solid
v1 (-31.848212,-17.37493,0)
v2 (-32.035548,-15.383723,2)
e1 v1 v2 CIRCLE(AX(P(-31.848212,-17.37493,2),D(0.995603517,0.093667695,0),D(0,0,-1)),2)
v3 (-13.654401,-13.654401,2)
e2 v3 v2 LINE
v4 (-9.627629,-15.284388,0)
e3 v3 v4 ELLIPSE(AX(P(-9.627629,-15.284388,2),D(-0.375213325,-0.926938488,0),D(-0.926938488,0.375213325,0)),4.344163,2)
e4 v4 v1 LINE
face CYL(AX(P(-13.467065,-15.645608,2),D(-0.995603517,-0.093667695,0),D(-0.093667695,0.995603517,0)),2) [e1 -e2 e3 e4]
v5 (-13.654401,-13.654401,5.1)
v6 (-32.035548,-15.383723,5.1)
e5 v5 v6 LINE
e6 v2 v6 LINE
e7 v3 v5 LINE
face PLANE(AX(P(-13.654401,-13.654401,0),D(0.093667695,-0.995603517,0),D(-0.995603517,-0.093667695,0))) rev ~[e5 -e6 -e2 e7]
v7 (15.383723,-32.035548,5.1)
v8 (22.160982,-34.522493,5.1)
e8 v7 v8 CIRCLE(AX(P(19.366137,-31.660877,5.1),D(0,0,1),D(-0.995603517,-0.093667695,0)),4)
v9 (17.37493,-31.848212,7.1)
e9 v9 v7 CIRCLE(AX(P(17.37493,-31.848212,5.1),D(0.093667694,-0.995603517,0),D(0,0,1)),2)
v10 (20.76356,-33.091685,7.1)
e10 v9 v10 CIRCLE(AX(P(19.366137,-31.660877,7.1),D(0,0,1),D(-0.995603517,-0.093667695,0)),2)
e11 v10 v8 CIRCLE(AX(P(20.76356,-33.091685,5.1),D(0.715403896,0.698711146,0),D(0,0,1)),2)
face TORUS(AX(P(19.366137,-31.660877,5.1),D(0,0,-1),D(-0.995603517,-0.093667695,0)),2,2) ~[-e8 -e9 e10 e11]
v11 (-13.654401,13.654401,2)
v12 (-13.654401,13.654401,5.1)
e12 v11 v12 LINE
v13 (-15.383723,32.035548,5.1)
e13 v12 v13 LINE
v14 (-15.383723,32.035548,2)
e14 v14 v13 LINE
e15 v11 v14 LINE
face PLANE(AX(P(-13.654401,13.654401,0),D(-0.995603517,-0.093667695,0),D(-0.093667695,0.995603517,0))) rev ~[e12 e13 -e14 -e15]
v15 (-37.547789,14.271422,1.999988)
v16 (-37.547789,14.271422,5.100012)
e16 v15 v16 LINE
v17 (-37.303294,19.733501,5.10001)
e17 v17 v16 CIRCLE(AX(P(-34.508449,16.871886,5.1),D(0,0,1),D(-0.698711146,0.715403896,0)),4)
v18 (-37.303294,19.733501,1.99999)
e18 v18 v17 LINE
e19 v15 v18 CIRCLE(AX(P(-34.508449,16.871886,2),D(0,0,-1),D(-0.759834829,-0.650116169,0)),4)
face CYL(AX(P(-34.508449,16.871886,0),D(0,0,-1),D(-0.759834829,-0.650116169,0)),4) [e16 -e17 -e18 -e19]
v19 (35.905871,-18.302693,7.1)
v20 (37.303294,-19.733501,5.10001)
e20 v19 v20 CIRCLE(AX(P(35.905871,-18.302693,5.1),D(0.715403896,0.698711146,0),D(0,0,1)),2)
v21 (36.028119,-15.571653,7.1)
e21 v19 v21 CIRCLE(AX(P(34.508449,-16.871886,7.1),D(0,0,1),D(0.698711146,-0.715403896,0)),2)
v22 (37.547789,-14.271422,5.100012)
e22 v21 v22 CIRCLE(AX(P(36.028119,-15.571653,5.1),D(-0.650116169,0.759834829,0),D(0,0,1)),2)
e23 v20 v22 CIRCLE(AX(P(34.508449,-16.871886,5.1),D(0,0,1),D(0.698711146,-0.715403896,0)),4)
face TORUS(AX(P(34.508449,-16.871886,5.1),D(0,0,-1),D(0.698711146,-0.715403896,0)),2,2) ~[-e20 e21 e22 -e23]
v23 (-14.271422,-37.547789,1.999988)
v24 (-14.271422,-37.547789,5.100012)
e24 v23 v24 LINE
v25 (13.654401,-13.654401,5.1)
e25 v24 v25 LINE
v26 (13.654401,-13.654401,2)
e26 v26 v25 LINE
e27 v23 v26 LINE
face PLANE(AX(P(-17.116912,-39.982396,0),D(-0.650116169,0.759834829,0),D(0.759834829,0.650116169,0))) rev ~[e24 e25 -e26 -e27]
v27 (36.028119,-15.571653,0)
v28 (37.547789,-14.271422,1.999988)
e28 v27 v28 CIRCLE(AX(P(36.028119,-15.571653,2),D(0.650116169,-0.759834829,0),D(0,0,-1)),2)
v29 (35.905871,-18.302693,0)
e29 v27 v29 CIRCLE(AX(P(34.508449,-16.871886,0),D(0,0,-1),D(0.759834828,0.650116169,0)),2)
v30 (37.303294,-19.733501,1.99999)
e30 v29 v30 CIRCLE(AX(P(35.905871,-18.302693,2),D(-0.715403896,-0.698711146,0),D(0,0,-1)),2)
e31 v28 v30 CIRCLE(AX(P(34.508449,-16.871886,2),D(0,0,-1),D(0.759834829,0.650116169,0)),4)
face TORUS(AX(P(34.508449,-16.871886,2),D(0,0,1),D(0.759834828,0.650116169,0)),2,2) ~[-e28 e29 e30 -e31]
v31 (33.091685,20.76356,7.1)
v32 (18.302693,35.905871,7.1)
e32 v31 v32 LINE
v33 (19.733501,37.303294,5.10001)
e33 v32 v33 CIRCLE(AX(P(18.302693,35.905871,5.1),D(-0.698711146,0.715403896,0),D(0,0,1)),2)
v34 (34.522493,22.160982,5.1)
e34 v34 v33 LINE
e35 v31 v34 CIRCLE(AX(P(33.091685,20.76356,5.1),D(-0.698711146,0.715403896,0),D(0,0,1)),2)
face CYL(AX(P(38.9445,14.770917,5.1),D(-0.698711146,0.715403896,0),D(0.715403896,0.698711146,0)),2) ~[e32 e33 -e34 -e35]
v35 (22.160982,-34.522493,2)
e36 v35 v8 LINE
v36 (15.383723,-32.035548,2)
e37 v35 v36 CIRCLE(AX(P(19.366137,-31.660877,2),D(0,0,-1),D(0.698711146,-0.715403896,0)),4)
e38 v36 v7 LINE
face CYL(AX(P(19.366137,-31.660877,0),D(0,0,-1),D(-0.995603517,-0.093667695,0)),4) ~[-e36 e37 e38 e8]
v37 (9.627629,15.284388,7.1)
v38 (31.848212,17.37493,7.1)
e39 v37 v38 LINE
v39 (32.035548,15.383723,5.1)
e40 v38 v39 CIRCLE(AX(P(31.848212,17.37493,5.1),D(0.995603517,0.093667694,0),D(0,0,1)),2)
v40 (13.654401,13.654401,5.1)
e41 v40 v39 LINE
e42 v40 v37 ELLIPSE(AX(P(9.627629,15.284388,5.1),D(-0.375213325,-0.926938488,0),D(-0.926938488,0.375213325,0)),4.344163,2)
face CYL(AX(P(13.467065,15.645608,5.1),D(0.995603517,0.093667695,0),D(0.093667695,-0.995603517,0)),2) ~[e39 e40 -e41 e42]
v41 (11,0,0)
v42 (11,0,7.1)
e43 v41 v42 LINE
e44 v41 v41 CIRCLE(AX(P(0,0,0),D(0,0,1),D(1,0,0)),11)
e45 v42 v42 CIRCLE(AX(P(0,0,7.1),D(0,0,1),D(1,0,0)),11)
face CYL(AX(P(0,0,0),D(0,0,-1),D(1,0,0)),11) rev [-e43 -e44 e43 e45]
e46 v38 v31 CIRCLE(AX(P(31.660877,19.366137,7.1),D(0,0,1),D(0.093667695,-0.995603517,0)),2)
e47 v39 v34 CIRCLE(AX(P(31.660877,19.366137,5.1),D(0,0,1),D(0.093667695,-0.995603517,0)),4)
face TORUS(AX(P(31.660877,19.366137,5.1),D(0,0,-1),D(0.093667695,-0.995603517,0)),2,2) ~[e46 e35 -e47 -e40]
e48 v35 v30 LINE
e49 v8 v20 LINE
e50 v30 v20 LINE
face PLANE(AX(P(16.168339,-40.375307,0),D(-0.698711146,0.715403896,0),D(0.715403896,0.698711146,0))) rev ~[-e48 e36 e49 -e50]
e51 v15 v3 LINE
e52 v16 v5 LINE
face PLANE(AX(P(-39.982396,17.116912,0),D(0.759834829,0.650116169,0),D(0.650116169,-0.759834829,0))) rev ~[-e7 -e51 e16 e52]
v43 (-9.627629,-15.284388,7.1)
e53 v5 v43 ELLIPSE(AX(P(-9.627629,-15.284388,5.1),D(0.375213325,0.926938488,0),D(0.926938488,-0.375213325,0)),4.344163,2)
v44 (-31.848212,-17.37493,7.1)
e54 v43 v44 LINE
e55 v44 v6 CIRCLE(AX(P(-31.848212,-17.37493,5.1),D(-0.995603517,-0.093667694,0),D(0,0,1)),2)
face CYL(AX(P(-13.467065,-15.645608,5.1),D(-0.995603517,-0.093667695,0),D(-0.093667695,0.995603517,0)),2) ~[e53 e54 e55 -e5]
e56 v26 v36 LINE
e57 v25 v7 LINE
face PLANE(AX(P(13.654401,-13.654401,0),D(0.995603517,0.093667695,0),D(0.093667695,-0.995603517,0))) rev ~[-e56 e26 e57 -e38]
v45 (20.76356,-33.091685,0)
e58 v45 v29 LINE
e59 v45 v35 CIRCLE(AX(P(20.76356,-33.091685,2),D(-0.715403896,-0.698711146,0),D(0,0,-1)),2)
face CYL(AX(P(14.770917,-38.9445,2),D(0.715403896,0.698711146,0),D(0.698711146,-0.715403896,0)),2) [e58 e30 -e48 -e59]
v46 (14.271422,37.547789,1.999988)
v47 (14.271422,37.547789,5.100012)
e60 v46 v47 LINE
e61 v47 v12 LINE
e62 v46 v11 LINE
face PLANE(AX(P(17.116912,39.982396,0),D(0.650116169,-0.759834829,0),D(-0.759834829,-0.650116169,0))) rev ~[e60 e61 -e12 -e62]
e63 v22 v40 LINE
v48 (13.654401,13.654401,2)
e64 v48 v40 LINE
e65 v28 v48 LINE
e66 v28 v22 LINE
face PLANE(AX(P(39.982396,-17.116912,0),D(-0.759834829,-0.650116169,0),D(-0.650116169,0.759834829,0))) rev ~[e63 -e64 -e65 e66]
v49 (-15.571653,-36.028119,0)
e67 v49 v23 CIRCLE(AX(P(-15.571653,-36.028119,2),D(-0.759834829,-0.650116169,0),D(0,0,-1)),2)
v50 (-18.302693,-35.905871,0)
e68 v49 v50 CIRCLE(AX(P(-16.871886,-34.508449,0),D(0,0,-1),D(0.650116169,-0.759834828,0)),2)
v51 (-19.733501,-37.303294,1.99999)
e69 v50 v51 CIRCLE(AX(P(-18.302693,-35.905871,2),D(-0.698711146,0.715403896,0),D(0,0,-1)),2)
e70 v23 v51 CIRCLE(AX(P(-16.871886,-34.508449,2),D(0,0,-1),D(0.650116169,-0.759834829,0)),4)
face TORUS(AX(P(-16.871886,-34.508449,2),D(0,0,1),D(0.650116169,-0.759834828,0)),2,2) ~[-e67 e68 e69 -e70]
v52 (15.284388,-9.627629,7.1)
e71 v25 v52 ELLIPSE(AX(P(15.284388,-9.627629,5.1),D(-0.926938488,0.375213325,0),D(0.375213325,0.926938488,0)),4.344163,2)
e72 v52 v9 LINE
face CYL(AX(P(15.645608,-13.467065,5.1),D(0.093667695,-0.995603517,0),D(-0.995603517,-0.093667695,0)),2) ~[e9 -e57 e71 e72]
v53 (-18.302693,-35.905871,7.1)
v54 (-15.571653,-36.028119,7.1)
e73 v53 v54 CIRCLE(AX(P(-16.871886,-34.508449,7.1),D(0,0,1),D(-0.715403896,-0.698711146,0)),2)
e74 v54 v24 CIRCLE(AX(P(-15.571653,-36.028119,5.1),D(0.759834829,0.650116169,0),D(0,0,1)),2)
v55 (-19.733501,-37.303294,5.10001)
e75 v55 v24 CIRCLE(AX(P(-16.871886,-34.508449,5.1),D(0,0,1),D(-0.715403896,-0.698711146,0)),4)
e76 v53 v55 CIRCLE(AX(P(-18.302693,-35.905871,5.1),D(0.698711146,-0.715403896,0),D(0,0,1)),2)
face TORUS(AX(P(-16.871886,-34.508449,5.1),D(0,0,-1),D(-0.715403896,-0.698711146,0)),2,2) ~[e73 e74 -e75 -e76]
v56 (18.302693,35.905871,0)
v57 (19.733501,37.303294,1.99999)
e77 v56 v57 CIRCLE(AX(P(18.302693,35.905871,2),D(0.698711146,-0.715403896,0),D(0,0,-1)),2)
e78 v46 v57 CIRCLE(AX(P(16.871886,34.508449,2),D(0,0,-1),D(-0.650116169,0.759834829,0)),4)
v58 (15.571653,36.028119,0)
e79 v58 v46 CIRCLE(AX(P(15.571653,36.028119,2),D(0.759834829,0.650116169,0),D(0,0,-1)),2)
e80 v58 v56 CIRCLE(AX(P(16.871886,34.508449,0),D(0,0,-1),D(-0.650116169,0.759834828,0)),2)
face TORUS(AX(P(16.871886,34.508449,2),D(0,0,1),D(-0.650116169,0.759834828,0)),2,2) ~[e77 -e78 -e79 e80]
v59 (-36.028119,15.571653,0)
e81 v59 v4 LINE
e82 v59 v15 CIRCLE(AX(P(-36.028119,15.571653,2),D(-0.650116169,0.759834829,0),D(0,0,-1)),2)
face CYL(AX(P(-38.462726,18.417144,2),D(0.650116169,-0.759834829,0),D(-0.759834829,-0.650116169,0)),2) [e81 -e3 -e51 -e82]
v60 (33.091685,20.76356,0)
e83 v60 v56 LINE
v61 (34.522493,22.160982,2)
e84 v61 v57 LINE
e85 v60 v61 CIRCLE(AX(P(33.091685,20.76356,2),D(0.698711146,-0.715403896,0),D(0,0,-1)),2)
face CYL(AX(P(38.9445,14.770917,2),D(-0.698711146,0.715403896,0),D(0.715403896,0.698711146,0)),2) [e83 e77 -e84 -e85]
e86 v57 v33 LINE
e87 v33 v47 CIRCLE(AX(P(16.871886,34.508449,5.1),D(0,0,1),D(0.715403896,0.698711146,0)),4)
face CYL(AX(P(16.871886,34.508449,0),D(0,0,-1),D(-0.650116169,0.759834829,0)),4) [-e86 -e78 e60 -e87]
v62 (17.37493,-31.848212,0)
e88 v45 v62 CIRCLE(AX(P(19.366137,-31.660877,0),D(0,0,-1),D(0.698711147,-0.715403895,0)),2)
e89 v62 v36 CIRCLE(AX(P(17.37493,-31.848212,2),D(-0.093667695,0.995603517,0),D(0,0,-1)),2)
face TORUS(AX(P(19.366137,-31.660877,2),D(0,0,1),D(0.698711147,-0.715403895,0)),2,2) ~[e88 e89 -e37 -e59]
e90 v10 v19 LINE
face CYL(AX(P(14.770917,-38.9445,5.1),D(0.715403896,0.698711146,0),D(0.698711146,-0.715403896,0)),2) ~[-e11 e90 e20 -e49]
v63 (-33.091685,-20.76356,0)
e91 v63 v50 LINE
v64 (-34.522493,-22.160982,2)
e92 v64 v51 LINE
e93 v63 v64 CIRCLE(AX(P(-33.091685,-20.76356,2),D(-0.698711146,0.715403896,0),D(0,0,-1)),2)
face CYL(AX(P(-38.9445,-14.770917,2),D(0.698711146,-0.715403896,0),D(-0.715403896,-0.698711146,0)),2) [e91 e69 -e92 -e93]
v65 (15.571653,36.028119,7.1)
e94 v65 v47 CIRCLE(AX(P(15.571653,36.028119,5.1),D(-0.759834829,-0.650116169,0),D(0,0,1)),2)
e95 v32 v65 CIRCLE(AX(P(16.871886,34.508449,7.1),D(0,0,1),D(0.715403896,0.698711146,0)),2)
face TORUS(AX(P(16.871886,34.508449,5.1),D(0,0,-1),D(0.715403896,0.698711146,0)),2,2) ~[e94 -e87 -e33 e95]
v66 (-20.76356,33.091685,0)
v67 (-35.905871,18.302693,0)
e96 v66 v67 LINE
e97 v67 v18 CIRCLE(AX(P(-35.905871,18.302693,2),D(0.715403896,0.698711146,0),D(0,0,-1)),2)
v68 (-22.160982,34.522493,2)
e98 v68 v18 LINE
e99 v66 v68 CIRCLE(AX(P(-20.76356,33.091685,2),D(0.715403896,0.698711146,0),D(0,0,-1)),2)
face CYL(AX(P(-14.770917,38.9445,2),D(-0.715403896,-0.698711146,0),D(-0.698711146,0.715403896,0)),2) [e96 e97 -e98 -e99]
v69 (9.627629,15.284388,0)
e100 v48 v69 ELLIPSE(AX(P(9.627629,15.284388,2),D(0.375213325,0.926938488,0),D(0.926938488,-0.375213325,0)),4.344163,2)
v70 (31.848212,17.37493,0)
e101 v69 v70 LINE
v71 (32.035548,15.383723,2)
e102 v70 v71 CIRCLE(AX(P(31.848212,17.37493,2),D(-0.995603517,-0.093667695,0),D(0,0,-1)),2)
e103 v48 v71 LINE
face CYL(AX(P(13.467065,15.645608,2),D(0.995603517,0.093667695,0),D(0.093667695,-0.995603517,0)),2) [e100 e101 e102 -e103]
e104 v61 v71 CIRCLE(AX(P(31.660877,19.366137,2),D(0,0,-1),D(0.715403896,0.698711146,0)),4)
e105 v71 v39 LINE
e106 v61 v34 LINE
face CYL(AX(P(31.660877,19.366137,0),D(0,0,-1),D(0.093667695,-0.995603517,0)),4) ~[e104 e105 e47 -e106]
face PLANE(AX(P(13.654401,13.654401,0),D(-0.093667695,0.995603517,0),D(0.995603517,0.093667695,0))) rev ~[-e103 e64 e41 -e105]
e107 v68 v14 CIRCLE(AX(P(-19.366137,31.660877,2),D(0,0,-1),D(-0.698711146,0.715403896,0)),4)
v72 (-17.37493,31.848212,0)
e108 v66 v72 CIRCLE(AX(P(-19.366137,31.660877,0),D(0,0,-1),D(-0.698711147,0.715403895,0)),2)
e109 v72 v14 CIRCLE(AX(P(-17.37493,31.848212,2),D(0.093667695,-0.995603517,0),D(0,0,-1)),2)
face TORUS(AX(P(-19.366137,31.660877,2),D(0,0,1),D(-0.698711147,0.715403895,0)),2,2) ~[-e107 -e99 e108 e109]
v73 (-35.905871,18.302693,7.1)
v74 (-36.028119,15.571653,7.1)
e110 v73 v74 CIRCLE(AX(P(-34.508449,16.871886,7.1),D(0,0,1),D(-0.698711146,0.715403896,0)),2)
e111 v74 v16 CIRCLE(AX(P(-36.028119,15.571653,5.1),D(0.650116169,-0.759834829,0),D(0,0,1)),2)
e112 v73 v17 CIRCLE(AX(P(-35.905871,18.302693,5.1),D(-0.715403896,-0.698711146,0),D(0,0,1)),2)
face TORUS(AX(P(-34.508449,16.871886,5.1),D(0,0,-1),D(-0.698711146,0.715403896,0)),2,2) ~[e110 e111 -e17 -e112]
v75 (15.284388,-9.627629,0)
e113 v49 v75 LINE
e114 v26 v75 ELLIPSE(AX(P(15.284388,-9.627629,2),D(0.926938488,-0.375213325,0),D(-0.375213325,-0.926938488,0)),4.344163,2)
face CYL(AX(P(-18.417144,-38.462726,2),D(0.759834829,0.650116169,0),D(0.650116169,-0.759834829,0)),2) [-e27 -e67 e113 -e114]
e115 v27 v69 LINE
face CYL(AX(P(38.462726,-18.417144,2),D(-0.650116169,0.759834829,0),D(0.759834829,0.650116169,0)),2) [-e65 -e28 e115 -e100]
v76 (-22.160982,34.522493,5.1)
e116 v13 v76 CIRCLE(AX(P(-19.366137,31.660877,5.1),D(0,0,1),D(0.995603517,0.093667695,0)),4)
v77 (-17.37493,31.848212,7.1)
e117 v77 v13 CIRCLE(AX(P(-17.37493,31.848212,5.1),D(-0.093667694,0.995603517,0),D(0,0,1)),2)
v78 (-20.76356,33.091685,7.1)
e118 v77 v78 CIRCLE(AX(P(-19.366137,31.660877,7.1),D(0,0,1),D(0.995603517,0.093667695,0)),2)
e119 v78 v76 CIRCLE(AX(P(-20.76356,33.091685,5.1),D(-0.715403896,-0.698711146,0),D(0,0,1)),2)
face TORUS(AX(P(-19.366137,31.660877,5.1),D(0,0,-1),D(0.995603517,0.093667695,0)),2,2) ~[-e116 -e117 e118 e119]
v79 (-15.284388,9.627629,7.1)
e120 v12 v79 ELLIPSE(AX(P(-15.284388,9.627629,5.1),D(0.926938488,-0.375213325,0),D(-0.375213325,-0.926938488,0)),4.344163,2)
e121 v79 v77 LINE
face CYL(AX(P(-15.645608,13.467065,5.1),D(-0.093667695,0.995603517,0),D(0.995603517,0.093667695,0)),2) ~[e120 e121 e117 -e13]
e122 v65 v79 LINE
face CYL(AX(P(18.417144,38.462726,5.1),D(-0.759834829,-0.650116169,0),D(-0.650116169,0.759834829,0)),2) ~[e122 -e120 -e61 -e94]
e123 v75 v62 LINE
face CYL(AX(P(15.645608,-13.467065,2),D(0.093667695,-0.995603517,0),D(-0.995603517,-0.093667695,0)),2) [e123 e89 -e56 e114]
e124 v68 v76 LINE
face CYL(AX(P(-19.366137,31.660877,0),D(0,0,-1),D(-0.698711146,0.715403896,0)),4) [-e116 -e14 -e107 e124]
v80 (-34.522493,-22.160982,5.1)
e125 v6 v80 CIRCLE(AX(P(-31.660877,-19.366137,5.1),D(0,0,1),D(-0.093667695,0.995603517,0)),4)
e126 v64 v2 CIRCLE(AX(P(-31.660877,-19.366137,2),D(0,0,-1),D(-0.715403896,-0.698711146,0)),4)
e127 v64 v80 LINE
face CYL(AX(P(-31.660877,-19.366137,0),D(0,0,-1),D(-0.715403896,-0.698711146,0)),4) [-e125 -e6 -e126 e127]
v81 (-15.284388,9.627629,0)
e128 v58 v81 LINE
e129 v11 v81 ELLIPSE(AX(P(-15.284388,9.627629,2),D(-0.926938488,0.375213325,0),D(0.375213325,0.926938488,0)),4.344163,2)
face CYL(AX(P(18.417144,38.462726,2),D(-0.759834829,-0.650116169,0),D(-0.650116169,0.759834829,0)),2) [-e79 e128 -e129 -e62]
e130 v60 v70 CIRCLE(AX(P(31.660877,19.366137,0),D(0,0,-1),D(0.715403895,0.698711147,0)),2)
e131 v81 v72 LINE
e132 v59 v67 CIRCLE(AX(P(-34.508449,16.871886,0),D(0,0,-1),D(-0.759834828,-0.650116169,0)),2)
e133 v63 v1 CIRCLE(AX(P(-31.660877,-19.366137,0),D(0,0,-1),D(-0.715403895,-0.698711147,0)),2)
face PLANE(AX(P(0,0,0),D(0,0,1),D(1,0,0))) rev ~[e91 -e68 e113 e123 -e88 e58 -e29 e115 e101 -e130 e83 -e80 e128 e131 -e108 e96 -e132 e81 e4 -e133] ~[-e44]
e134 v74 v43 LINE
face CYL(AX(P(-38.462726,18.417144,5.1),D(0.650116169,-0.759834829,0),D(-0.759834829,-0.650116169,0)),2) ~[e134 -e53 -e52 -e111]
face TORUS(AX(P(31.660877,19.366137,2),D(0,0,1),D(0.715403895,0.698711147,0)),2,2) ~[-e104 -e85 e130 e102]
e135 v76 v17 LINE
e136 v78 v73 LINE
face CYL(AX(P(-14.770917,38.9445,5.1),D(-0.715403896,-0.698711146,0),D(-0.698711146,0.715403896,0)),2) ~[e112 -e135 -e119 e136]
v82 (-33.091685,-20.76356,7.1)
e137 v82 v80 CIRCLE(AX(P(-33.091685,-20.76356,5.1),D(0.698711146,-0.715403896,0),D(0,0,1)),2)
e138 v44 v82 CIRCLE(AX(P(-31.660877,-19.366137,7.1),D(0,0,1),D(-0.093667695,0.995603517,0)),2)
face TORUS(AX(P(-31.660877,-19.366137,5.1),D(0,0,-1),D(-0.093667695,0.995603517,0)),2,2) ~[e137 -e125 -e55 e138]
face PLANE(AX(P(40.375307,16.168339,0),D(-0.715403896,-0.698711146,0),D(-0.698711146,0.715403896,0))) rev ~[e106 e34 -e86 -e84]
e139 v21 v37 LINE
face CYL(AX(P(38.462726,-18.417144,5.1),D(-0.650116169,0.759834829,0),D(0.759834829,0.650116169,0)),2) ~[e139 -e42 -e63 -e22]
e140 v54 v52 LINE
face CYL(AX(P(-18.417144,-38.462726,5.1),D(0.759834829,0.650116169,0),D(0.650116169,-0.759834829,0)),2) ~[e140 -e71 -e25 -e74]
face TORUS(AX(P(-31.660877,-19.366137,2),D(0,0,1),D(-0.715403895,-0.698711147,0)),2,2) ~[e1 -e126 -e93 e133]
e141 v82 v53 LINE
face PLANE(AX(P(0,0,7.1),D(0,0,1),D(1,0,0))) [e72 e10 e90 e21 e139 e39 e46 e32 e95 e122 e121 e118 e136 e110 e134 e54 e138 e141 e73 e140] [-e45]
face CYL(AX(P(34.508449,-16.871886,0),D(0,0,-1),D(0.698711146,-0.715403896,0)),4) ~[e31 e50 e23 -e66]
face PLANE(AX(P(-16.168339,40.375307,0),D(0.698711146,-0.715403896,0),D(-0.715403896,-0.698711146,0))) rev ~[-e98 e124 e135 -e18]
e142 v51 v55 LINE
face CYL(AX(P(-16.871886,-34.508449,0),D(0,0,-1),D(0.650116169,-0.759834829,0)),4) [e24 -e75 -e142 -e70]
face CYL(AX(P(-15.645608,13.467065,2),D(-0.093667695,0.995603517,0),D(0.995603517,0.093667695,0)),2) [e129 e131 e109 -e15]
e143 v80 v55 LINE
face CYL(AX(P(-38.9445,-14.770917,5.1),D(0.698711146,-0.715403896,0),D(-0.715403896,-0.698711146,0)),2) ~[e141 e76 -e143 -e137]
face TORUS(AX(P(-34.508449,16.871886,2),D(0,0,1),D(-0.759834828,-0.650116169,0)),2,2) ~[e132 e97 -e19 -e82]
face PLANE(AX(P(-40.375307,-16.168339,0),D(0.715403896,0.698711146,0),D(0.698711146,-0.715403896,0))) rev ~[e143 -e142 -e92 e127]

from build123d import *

# Parameters (mm, degrees)
F0_W         = 27.3088011891
F0_H         = 27.3088011891
F0_R         = 11
F1_DEPTH     = 7.1
F2_R         = 2
F3_T1_DEPTH  = 7.1
F3_T4_ANGLE  = 128.9490479257
F3_T6_ANGLE  = 128.9490479257
F3_T8_ANGLE  = 128.9490479257
F3_T10_ANGLE = 128.9490479257
F3_T12_ANGLE = 128.9490479257
F3_T14_ANGLE = 128.9490479257
F3_T16_ANGLE = 128.9490479257
F3_T18_ANGLE = 128.9490479257
F3_T20_ANGLE = 86.2266707628
F3_T22_ANGLE = 86.2266707628
F3_T24_ANGLE = 86.2266707628
F3_T26_ANGLE = 86.2266707628
F3_T28_ANGLE = 86.2266707628
F3_T30_ANGLE = 86.2266707628
F3_T32_ANGLE = 86.2266707628
F3_T34_ANGLE = 86.2266707628


# Not quite as in the source:
# - a fillet or chamfer that OpenCascade refuses, or shapes differently, is made with other operations: its cross-section is extruded or revolved along the edge and cut away or added


with BuildPart() as f1:
    # F0 (on Top) → F1 (new body)
    with BuildSketch(Plane.XY):
        Rectangle(F0_W, F0_H)
        Circle(F0_R, mode=Mode.SUBTRACT)
        Polygon((13.6544005945, 13.6544005945), (40.3753073238, 16.1683388102), (17.1169115879, 39.9823956144), (-13.6544005945, 13.6544005945), align=None)
        Polygon((16.1683388102, -40.3753073238), (39.9823956144, -17.1169115879), (13.6544005945, 13.6544005945), (13.6544005945, -13.6544005945), align=None)
        Polygon((-40.3753073238, -16.1683388102), (-17.1169115879, -39.9823956144), (13.6544005945, -13.6544005945), (-13.6544005945, -13.6544005945), align=None)
        Polygon((-13.6544005945, -13.6544005945), (-13.6544005945, 13.6544005945), (-16.1683388102, 40.3753073238), (-39.9823956144, 17.1169115879), align=None)
    extrude(amount=F1_DEPTH)

    # F2
    f2_edges = [f1.edges().sort_by_distance(p)[0] for p in [
        (-1.731255, -26.818398, 7.1),
        (14.91137, -27.014854, 7.1),
        (28.075367, -28.746109, 7.1),
        (26.818398, -1.731255, 7.1),
        (27.014854, 14.91137, 7.1),
        (28.746109, 28.075367, 7.1),
        (1.731255, 26.818398, 7.1),
        (-14.91137, 27.014854, 7.1),
        (-28.075367, 28.746109, 7.1),
        (-26.818398, 1.731255, 7.1),
        (-27.014854, -14.91137, 7.1),
        (-28.746109, -28.075367, 7.1),
        (-28.746109, -28.075367, 0),
        (-27.014854, -14.91137, 0),
        (-26.818398, 1.731255, 0),
        (-28.075367, 28.746109, 0),
        (-14.91137, 27.014854, 0),
        (1.731255, 26.818398, 0),
        (28.746109, 28.075367, 0),
        (27.014854, 14.91137, 0),
        (26.818398, -1.731255, 0),
        (28.075367, -28.746109, 0),
        (14.91137, -27.014854, 0),
        (-1.731255, -26.818398, 0),
    ]]
    fillet(f2_edges, radius=F2_R)

    # F3: fillet of radius 4 on 8 edges, made by hand

    # F3_s2 → F3_t1 (cut)
    with BuildSketch(Plane.XY):
        with BuildLine():
            ThreePointArc((37.3032935738, -19.7335012764), (38.5044476922, -17.050755387), (37.5477883044, -14.2714210172))
            Line((37.5477883044, -14.2714210172), (39.9823956144, -17.1169115879))
            Line((39.9823956144, -17.1169115879), (37.3032935738, -19.7335012764))
        make_face()
        with BuildLine():
            ThreePointArc((14.2714210172, 37.5477883044), (17.050755387, 38.5044476922), (19.7335012764, 37.3032935738))
            Line((19.7335012764, 37.3032935738), (17.1169115879, 39.9823956144))
            Line((17.1169115879, 39.9823956144), (14.2714210172, 37.5477883044))
        make_face()
        with BuildLine():
            ThreePointArc((-37.5477883044, 14.2714210172), (-38.5044476922, 17.050755387), (-37.3032935738, 19.7335012764))
            Line((-37.3032935738, 19.7335012764), (-39.9823956144, 17.1169115879))
            Line((-39.9823956144, 17.1169115879), (-37.5477883044, 14.2714210172))
        make_face()
        with BuildLine():
            ThreePointArc((-14.2714210172, -37.5477883044), (-17.050755387, -38.5044476922), (-19.7335012764, -37.3032935738))
            Line((-19.7335012764, -37.3032935738), (-17.1169115879, -39.9823956144))
            Line((-17.1169115879, -39.9823956144), (-14.2714210172, -37.5477883044))
        make_face()
        with BuildLine():
            ThreePointArc((15.383723208, -32.0355477412), (17.988166327, -35.4160328938), (22.1609818603, -34.5224925468))
            Line((22.1609818603, -34.5224925468), (16.1683388102, -40.3753073238))
            Line((16.1683388102, -40.3753073238), (15.383723208, -32.0355477412))
        make_face()
        with BuildLine():
            ThreePointArc((-34.5224925468, -22.1609818603), (-35.4160328938, -17.988166327), (-32.0355477412, -15.383723208))
            Line((-32.0355477412, -15.383723208), (-40.3753073238, -16.1683388102))
            Line((-40.3753073238, -16.1683388102), (-34.5224925468, -22.1609818603))
        make_face()
        with BuildLine():
            ThreePointArc((-22.1609818603, 34.5224925468), (-17.988166327, 35.4160328938), (-15.383723208, 32.0355477412))
            Line((-15.383723208, 32.0355477412), (-16.1683388102, 40.3753073238))
            Line((-16.1683388102, 40.3753073238), (-22.1609818603, 34.5224925468))
        make_face()
        with BuildLine():
            ThreePointArc((32.0355477412, 15.383723208), (35.4160328938, 17.988166327), (34.5224925468, 22.1609818603))
            Line((34.5224925468, 22.1609818603), (40.3753073238, 16.1683388102))
            Line((40.3753073238, 16.1683388102), (32.0355477412, 15.383723208))
        make_face()
    extrude(amount=F3_T1_DEPTH, mode=Mode.SUBTRACT)

    # F3_s3 → F3_t4 (revolve, cut)
    with BuildSketch(Plane(origin=(5.776383091, -5.914385352, 0), x_dir=(0, 0, 1), z_dir=(-0.6987111461, 0.7154038959, 0))):
        with BuildLine():
            ThreePointArc((0, 38.1816506997), (0.5857864376, 39.5958642621), (2, 40.1816506997))
            Line((2, 40.1816506997), (0, 40.1816506997))
            Line((0, 40.1816506997), (0, 38.1816506997))
        make_face()
    revolve(axis=Axis((31.6608769631, 19.3661372759, 0), (0, 0, -1)), revolution_arc=F3_T4_ANGLE, mode=Mode.SUBTRACT)

    # F3_s5 → F3_t6 (revolve, cut)
    with BuildSketch(Plane(origin=(33.1891022135, 3.1224745943, 0), x_dir=(0, 0, 1), z_dir=(-0.995603517, -0.0936676945, 0))):
        with BuildLine():
            ThreePointArc((7.1, 14.3153930302), (6.5142135624, 12.9011794678), (5.1, 12.3153930302))
            Line((5.1, 12.3153930302), (7.1, 12.3153930302))
            Line((7.1, 12.3153930302), (7.1, 14.3153930302))
        make_face()
    revolve(axis=Axis((31.6608769631, 19.3661372759, 7.1), (0, 0, 1)), revolution_arc=F3_T6_ANGLE, mode=Mode.SUBTRACT)

    # F3_s7 → F3_t8 (revolve, cut)
    with BuildSketch(Plane(origin=(5.914385352, 5.776383091, 0), x_dir=(0, 0, 1), z_dir=(-0.7154038959, -0.6987111461, 0))):
        with BuildLine():
            ThreePointArc((0, 38.1816506997), (0.5857864376, 39.5958642621), (2, 40.1816506997))
            Line((2, 40.1816506997), (0, 40.1816506997))
            Line((0, 40.1816506997), (0, 38.1816506997))
        make_face()
    revolve(axis=Axis((-19.3661372759, 31.6608769631, 0), (0, 0, -1)), revolution_arc=F3_T8_ANGLE, mode=Mode.SUBTRACT)

    # F3_s9 → F3_t10 (revolve, cut)
    with BuildSketch(Plane(origin=(-3.1224745943, 33.1891022135, 0), x_dir=(0, 0, 1), z_dir=(0.0936676945, -0.995603517, 0))):
        with BuildLine():
            ThreePointArc((7.1, 14.3153930302), (6.5142135624, 12.9011794678), (5.1, 12.3153930302))
            Line((5.1, 12.3153930302), (7.1, 12.3153930302))
            Line((7.1, 12.3153930302), (7.1, 14.3153930302))
        make_face()
    revolve(axis=Axis((-19.3661372759, 31.6608769631, 7.1), (0, 0, 1)), revolution_arc=F3_T10_ANGLE, mode=Mode.SUBTRACT)

    # F3_s11 → F3_t12 (revolve, cut)
    with BuildSketch(Plane(origin=(-5.776383091, 5.914385352, 0), x_dir=(0, 0, 1), z_dir=(0.6987111461, -0.7154038959, 0))):
        with BuildLine():
            ThreePointArc((0, 38.1816506997), (0.5857864376, 39.5958642621), (2, 40.1816506997))
            Line((2, 40.1816506997), (0, 40.1816506997))
            Line((0, 40.1816506997), (0, 38.1816506997))
        make_face()
    revolve(axis=Axis((-31.6608769631, -19.3661372759, 0), (0, 0, -1)), revolution_arc=F3_T12_ANGLE, mode=Mode.SUBTRACT)

    # F3_s13 → F3_t14 (revolve, cut)
    with BuildSketch(Plane(origin=(-33.1891022135, -3.1224745943, 0), x_dir=(0, 0, 1), z_dir=(0.995603517, 0.0936676945, 0))):
        with BuildLine():
            ThreePointArc((7.1, 14.3153930302), (6.5142135624, 12.9011794678), (5.1, 12.3153930302))
            Line((5.1, 12.3153930302), (7.1, 12.3153930302))
            Line((7.1, 12.3153930302), (7.1, 14.3153930302))
        make_face()
    revolve(axis=Axis((-31.6608769631, -19.3661372759, 7.1), (0, 0, 1)), revolution_arc=F3_T14_ANGLE, mode=Mode.SUBTRACT)

    # F3_s15 → F3_t16 (revolve, cut)
    with BuildSketch(Plane(origin=(-5.914385352, -5.776383091, 0), x_dir=(0, 0, 1), z_dir=(0.7154038959, 0.6987111461, 0))):
        with BuildLine():
            ThreePointArc((0, 38.1816506997), (0.5857864376, 39.5958642621), (2, 40.1816506997))
            Line((2, 40.1816506997), (0, 40.1816506997))
            Line((0, 40.1816506997), (0, 38.1816506997))
        make_face()
    revolve(axis=Axis((19.3661372759, -31.6608769631, 0), (0, 0, -1)), revolution_arc=F3_T16_ANGLE, mode=Mode.SUBTRACT)

    # F3_s17 → F3_t18 (revolve, cut)
    with BuildSketch(Plane(origin=(3.1224745943, -33.1891022135, 0), x_dir=(0, 0, 1), z_dir=(-0.0936676945, 0.995603517, 0))):
        with BuildLine():
            ThreePointArc((7.1, 14.3153930302), (6.5142135624, 12.9011794678), (5.1, 12.3153930302))
            Line((5.1, 12.3153930302), (7.1, 12.3153930302))
            Line((7.1, 12.3153930302), (7.1, 14.3153930302))
        make_face()
    revolve(axis=Axis((19.3661372759, -31.6608769631, 7.1), (0, 0, 1)), revolution_arc=F3_T18_ANGLE, mode=Mode.SUBTRACT)

    # F3_s19 → F3_t20 (revolve, cut)
    with BuildSketch(Plane(origin=(-26.7874807354, -22.9194210249, 0), x_dir=(0, 0, 1), z_dir=(0.7598348287, 0.6501161689, 0))):
        with BuildLine():
            ThreePointArc((0, 17.2520357401), (0.5857864376, 18.6662493025), (2, 19.2520357401))
            Line((2, 19.2520357401), (0, 19.2520357401))
            Line((0, 19.2520357401), (0, 17.2520357401))
        make_face()
    revolve(axis=Axis((-16.8718856926, -34.5084489895, 0), (0, 0, -1)), revolution_arc=F3_T20_ANGLE, mode=Mode.SUBTRACT)

    # F3_s21 → F3_t22 (revolve, cut)
    with BuildSketch(Plane(origin=(9.0126081794, -9.2279263615, 0), x_dir=(0, 0, 1), z_dir=(-0.6987111461, 0.7154038959, 0))):
        with BuildLine():
            ThreePointArc((7.1, -38.1816506997), (6.5142135624, -39.5958642621), (5.1, -40.1816506997))
            Line((5.1, -40.1816506997), (7.1, -40.1816506997))
            Line((7.1, -40.1816506997), (7.1, -38.1816506997))
        make_face()
    revolve(axis=Axis((-16.8718856926, -34.5084489895, 7.1), (0, 0, 1)), revolution_arc=F3_T22_ANGLE, mode=Mode.SUBTRACT)

    # F3_s23 → F3_t24 (revolve, cut)
    with BuildSketch(Plane(origin=(-22.9194210249, 26.7874807354, 0), x_dir=(0, 0, 1), z_dir=(0.6501161689, -0.7598348287, 0))):
        with BuildLine():
            ThreePointArc((0, 17.2520357401), (0.5857864376, 18.6662493025), (2, 19.2520357401))
            Line((2, 19.2520357401), (0, 19.2520357401))
            Line((0, 19.2520357401), (0, 17.2520357401))
        make_face()
    revolve(axis=Axis((-34.5084489895, 16.8718856926, 0), (0, 0, -1)), revolution_arc=F3_T24_ANGLE, mode=Mode.SUBTRACT)

    # F3_s25 → F3_t26 (revolve, cut)
    with BuildSketch(Plane(origin=(-9.2279263615, -9.0126081794, 0), x_dir=(0, 0, 1), z_dir=(0.7154038959, 0.6987111461, 0))):
        with BuildLine():
            ThreePointArc((7.1, -38.1816506997), (6.5142135624, -39.5958642621), (5.1, -40.1816506997))
            Line((5.1, -40.1816506997), (7.1, -40.1816506997))
            Line((7.1, -40.1816506997), (7.1, -38.1816506997))
        make_face()
    revolve(axis=Axis((-34.5084489895, 16.8718856926, 7.1), (0, 0, 1)), revolution_arc=F3_T26_ANGLE, mode=Mode.SUBTRACT)

    # F3_s27 → F3_t28 (revolve, cut)
    with BuildSketch(Plane(origin=(26.7874807354, 22.9194210249, 0), x_dir=(0, 0, 1), z_dir=(-0.7598348287, -0.6501161689, 0))):
        with BuildLine():
            ThreePointArc((0, 17.2520357401), (0.5857864376, 18.6662493025), (2, 19.2520357401))
            Line((2, 19.2520357401), (0, 19.2520357401))
            Line((0, 19.2520357401), (0, 17.2520357401))
        make_face()
    revolve(axis=Axis((16.8718856926, 34.5084489895, 0), (0, 0, -1)), revolution_arc=F3_T28_ANGLE, mode=Mode.SUBTRACT)

    # F3_s29 → F3_t30 (revolve, cut)
    with BuildSketch(Plane(origin=(-9.0126081794, 9.2279263615, 0), x_dir=(0, 0, 1), z_dir=(0.6987111461, -0.7154038959, 0))):
        with BuildLine():
            ThreePointArc((7.1, -38.1816506997), (6.5142135624, -39.5958642621), (5.1, -40.1816506997))
            Line((5.1, -40.1816506997), (7.1, -40.1816506997))
            Line((7.1, -40.1816506997), (7.1, -38.1816506997))
        make_face()
    revolve(axis=Axis((16.8718856926, 34.5084489895, 7.1), (0, 0, 1)), revolution_arc=F3_T30_ANGLE, mode=Mode.SUBTRACT)

    # F3_s31 → F3_t32 (revolve, cut)
    with BuildSketch(Plane(origin=(22.9194210249, -26.7874807354, 0), x_dir=(0, 0, 1), z_dir=(-0.6501161689, 0.7598348287, 0))):
        with BuildLine():
            ThreePointArc((0, 17.2520357401), (0.5857864376, 18.6662493025), (2, 19.2520357401))
            Line((2, 19.2520357401), (0, 19.2520357401))
            Line((0, 19.2520357401), (0, 17.2520357401))
        make_face()
    revolve(axis=Axis((34.5084489895, -16.8718856926, 0), (0, 0, -1)), revolution_arc=F3_T32_ANGLE, mode=Mode.SUBTRACT)

    # F3_s33 → F3_t34 (revolve, cut)
    with BuildSketch(Plane(origin=(9.2279263615, 9.0126081794, 0), x_dir=(0, 0, 1), z_dir=(-0.7154038959, -0.6987111461, 0))):
        with BuildLine():
            ThreePointArc((7.1, -38.1816506997), (6.5142135624, -39.5958642621), (5.1, -40.1816506997))
            Line((5.1, -40.1816506997), (7.1, -40.1816506997))
            Line((7.1, -40.1816506997), (7.1, -38.1816506997))
        make_face()
    revolve(axis=Axis((34.5084489895, -16.8718856926, 7.1), (0, 0, 1)), revolution_arc=F3_T34_ANGLE, mode=Mode.SUBTRACT)


solid = f1.part
